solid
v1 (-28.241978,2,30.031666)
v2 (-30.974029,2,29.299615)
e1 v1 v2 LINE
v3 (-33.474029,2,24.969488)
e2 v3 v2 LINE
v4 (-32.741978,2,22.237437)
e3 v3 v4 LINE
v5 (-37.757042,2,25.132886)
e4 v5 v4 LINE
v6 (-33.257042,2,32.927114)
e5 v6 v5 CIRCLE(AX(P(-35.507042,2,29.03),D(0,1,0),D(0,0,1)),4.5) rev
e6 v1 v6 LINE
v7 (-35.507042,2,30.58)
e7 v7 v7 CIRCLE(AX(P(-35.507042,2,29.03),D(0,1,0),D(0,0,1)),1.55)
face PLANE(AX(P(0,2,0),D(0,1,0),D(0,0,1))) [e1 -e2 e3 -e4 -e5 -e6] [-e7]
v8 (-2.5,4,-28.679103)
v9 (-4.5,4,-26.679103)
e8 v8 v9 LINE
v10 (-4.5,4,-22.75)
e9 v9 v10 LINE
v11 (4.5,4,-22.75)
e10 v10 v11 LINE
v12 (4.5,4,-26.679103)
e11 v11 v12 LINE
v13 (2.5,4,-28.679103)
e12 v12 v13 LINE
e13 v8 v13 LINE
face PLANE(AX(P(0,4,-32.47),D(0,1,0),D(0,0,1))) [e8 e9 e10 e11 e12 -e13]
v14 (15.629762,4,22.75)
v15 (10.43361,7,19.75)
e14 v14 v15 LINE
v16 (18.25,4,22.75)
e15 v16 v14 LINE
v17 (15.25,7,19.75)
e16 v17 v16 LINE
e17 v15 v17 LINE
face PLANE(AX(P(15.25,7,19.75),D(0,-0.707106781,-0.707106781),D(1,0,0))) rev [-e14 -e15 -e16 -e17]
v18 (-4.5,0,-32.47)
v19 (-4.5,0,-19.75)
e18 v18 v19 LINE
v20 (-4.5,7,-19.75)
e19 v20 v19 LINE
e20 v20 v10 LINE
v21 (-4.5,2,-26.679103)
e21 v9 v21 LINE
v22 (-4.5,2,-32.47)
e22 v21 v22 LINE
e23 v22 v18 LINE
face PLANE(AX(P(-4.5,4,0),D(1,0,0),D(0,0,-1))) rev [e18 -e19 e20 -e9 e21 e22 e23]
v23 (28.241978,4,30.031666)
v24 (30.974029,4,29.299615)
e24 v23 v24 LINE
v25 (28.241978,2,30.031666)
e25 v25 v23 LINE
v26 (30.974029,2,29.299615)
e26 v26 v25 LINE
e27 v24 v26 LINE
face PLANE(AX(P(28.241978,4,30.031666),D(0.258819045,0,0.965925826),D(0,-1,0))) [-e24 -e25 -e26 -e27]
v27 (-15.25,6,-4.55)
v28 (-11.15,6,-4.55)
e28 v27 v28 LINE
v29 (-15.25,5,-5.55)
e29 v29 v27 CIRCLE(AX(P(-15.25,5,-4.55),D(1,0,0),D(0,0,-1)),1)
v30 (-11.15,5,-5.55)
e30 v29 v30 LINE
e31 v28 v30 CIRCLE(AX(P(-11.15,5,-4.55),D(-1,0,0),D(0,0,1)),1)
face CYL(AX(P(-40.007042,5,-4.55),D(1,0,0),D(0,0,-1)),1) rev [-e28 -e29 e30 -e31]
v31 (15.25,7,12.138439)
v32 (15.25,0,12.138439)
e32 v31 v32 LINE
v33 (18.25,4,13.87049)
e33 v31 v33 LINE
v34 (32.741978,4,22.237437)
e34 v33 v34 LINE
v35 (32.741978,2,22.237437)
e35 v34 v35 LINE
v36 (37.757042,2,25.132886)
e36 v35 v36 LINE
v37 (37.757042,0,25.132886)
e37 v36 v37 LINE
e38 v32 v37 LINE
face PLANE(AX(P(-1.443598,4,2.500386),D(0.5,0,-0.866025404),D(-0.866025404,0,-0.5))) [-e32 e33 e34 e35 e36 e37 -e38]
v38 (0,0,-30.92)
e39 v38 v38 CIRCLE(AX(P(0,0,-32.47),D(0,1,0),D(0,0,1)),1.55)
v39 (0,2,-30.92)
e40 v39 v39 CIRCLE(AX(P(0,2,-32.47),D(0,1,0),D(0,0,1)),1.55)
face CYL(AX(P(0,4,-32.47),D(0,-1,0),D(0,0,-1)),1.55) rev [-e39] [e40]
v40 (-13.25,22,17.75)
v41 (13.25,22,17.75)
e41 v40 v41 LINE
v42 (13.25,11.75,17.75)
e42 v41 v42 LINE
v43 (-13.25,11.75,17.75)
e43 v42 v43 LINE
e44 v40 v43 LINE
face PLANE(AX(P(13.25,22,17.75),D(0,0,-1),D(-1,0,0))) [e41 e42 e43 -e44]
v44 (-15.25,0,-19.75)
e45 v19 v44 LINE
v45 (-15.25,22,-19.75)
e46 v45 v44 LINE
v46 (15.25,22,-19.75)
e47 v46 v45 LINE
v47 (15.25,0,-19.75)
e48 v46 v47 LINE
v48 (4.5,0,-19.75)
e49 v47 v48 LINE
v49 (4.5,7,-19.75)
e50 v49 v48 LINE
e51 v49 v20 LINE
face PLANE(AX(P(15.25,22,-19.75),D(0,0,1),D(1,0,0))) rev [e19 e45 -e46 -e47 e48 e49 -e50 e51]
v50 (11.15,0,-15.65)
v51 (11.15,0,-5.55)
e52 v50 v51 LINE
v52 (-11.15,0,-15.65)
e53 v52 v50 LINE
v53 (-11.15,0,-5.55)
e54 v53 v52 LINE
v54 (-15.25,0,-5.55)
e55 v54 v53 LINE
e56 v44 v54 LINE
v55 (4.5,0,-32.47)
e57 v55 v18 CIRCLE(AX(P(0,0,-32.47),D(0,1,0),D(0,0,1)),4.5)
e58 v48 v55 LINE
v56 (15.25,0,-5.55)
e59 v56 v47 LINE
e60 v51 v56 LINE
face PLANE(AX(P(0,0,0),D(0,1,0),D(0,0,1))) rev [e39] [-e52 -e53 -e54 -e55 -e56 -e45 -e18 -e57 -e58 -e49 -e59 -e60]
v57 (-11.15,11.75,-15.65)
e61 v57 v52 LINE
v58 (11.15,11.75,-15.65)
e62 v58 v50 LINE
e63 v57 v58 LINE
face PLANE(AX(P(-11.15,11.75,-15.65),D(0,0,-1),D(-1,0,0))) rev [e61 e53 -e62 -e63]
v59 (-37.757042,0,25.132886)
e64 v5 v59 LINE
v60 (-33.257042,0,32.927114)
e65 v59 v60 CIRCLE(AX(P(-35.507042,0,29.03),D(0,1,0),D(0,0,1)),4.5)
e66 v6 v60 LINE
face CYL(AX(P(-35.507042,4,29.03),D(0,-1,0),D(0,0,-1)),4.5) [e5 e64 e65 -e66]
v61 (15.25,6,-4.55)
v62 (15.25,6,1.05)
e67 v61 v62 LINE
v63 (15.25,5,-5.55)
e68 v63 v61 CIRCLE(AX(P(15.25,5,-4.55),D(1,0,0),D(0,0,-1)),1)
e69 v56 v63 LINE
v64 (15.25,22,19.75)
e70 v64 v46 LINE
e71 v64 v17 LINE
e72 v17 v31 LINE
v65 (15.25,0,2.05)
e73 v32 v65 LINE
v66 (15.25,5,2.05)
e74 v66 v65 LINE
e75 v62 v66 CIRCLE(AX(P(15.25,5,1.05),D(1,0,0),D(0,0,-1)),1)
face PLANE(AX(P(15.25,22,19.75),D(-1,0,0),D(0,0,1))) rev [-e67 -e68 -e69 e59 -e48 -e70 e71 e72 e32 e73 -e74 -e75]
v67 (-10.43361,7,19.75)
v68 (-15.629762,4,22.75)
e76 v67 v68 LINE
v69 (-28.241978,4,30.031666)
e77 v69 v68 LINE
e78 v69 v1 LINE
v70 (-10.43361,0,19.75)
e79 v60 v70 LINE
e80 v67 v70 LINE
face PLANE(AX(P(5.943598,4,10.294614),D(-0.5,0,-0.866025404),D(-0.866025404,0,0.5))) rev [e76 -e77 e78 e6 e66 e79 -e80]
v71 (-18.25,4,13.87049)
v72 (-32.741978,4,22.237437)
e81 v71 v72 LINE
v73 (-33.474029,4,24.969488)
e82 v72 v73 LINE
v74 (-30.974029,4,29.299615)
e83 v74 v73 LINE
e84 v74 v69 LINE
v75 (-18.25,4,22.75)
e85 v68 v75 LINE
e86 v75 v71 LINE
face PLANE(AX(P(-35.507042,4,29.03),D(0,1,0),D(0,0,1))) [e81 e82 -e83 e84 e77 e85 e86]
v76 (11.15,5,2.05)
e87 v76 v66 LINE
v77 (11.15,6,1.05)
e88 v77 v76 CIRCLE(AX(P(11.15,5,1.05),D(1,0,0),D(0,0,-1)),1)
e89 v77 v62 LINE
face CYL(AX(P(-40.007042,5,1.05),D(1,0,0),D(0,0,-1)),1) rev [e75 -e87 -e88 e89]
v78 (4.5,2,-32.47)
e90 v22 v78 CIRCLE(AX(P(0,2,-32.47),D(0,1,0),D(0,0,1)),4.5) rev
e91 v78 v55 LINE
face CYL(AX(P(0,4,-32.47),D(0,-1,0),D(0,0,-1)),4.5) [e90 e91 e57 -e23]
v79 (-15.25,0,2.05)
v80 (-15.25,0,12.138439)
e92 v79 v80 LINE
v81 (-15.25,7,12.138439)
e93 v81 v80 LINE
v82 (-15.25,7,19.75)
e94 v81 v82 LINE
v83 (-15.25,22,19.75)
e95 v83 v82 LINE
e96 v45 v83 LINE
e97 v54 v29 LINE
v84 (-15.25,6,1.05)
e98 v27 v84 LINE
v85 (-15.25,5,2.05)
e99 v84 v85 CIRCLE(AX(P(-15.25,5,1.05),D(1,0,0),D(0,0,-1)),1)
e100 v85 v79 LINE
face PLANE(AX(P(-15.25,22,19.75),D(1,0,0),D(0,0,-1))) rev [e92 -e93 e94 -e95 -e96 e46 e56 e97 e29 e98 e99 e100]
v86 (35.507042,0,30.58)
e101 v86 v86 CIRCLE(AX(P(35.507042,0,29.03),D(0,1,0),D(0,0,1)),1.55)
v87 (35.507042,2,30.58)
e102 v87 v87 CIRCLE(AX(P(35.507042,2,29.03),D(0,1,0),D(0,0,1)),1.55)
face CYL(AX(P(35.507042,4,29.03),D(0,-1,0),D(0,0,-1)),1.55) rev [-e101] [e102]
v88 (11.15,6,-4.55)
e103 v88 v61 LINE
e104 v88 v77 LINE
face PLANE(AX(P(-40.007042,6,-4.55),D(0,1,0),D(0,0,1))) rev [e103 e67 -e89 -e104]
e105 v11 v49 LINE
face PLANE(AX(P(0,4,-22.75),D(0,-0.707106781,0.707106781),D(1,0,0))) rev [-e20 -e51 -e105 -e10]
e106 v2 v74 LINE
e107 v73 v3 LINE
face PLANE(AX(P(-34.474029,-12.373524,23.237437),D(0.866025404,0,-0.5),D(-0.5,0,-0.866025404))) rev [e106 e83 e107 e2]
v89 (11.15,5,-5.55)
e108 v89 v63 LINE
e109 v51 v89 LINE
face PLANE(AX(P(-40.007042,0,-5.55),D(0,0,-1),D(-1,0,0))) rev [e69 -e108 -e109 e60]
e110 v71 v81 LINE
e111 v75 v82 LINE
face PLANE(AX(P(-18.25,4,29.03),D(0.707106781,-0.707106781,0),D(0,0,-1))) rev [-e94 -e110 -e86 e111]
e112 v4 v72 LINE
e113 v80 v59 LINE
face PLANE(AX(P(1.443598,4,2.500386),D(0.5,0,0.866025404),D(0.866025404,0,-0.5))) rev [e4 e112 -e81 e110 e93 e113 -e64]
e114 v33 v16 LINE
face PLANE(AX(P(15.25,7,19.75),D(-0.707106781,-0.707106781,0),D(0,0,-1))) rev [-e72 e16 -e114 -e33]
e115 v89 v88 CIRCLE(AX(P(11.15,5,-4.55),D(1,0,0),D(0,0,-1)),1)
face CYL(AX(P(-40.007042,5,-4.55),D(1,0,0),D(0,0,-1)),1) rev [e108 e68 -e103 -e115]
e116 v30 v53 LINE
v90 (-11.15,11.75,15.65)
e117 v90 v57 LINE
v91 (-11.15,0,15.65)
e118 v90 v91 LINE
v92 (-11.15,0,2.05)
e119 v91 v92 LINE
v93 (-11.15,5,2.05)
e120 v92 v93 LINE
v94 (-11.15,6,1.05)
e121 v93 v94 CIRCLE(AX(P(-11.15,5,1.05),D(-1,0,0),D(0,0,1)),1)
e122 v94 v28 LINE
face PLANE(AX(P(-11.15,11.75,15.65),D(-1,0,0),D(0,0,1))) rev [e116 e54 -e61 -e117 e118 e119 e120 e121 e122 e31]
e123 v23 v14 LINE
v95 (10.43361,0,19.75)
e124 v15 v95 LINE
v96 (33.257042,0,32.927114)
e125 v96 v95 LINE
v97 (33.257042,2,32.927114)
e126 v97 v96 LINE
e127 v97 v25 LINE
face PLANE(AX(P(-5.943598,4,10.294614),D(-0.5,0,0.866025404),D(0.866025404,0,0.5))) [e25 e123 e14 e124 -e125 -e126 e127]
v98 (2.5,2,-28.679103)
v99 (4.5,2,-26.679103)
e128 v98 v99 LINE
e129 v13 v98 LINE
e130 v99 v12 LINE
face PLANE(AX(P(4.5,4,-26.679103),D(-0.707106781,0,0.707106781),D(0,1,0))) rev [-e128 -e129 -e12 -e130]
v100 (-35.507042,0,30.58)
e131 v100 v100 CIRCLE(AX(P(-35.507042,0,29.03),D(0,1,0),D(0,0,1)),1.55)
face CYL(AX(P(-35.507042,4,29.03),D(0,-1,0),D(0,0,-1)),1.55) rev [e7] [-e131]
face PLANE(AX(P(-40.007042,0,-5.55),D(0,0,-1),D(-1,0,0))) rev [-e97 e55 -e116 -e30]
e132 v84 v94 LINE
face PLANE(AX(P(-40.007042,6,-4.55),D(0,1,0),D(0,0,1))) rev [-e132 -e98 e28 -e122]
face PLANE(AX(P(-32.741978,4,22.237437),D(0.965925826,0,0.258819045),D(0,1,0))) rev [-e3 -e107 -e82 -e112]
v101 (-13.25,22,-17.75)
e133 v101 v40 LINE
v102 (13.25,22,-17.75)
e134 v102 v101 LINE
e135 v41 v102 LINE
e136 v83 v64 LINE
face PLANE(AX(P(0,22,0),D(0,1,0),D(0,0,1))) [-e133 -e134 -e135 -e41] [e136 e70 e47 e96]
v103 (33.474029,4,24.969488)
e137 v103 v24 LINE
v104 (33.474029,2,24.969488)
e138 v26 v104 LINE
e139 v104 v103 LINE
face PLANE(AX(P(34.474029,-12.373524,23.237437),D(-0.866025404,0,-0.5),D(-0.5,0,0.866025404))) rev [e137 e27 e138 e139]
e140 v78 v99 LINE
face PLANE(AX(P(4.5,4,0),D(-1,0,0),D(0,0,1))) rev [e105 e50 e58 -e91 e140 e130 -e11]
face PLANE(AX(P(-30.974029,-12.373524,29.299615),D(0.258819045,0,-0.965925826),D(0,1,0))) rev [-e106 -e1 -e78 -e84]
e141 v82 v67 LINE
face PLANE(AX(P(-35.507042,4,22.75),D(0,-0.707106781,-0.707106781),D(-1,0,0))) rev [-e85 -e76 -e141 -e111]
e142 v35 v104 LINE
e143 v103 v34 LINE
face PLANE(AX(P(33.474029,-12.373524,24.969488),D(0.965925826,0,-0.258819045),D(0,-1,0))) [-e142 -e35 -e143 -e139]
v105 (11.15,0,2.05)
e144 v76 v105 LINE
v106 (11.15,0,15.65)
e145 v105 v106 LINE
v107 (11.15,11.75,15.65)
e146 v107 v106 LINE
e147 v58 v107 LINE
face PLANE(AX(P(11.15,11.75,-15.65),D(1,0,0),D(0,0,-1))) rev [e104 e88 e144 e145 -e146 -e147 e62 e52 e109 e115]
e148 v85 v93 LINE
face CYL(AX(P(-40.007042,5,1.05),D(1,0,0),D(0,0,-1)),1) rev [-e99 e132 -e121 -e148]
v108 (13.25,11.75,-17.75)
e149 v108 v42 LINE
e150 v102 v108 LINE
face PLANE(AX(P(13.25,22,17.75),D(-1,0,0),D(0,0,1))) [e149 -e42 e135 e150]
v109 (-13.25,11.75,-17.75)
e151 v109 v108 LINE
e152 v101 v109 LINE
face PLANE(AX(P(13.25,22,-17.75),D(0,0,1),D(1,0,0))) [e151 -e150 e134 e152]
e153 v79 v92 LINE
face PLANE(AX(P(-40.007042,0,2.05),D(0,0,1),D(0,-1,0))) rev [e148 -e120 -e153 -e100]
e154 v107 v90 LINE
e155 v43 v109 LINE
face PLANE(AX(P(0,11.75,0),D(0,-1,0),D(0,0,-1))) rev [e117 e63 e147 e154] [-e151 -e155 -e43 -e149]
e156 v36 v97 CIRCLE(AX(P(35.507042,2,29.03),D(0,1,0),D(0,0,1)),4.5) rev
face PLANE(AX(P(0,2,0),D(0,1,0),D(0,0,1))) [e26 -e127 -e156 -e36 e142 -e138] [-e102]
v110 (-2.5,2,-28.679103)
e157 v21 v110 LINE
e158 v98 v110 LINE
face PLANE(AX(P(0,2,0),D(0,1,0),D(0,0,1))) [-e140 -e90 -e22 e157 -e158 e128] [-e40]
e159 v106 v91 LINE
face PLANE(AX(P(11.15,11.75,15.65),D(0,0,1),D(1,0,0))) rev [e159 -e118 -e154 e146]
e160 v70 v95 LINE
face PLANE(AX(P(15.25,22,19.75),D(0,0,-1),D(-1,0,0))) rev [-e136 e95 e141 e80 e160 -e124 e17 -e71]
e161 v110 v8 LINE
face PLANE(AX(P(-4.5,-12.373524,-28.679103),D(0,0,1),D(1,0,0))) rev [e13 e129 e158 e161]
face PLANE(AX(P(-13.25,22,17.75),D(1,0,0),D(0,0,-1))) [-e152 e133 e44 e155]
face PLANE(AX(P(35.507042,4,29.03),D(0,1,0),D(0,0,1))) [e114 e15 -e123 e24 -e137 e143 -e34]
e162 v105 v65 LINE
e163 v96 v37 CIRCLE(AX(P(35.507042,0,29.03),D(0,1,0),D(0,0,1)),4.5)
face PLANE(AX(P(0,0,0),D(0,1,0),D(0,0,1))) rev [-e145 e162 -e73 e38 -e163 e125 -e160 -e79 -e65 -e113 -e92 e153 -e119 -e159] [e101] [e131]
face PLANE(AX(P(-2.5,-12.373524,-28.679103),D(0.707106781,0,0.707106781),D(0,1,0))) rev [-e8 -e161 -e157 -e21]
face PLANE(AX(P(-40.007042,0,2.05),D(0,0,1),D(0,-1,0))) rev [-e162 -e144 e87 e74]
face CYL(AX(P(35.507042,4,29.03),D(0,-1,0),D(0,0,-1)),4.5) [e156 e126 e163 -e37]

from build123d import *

# Parameters (mm, degrees)
SKETCH1_W           = 30.5
SKETCH1_H           = 39.5
SKETCH1_W_2         = 26.5
SKETCH1_H_2         = 35.5
BOSS_EXTRUDE1_DEPTH = 22
SKETCH3_W           = 26.5
SKETCH3_H           = 35.5
SKETCH3_W_2         = 22.3
SKETCH3_H_2         = 31.3
BOSS_EXTRUDE3_DEPTH = 11.75
BOSS_EXTRUDE4_START = -22
SKETCH4_R           = 1.55
BOSS_EXTRUDE4_DEPTH = 4
CUT_EXTRUDE1_DEPTH  = 2
CHAMFER2_SIZE       = 3
CUT_EXTRUDE2_DEPTH  = 71.029433394
CUT_EXTRUDE3_START  = -2
CUT_EXTRUDE3_DEPTH  = 2
CHAMFER3_SIZE       = 2


with BuildPart() as part:
    # Sketch1 → Boss-Extrude1 (new body)
    with BuildSketch(Plane(origin=(0, 0, 0), x_dir=(1, 0, 0), z_dir=(0, 1, 0))):
        Rectangle(SKETCH1_W, SKETCH1_H)
        Rectangle(SKETCH1_W_2, SKETCH1_H_2, mode=Mode.SUBTRACT)
    extrude(amount=BOSS_EXTRUDE1_DEPTH)

    # Sketch3 → Boss-Extrude3 (add)
    with BuildSketch(Plane.XZ):
        Rectangle(SKETCH3_W, SKETCH3_H)
        Rectangle(SKETCH3_W_2, SKETCH3_H_2, mode=Mode.SUBTRACT)
    extrude(amount=-BOSS_EXTRUDE3_DEPTH)

    # Sketch4 → Boss-Extrude4 (add)
    # profile 1 of 2: a face of its own
    with BuildSketch(Plane(origin=(0, 22, 0), x_dir=(1, 0, 0), z_dir=(0, 1, 0)).offset(BOSS_EXTRUDE4_START)):
        with BuildLine():
            Line((-33.257041555, -32.927114317), (-10.433610061, -19.75))
            Line((-10.433610061, -19.75), (-15.25, -19.75))
            Line((-15.25, -19.75), (-15.25, -12.138439182))
            Line((-15.25, -12.138439182), (-37.757041555, -25.132885683))
            ThreePointArc((-37.757041555, -25.132885683), (-39.404155872, -31.28), (-33.257041555, -32.927114317))
        make_face()
        with Locations(Location((-35.507041555, -29.03, 0), (0, 0, 270))):
            Circle(SKETCH4_R, mode=Mode.SUBTRACT)
    # profile 2 of 2: a face of its own
    with BuildSketch(Plane(origin=(0, 22, 0), x_dir=(1, 0, 0), z_dir=(0, 1, 0)).offset(BOSS_EXTRUDE4_START)):
        with BuildLine():
            Line((-4.5, 19.75), (4.5, 19.75))
            Line((4.5, 19.75), (4.5, 32.47))
            ThreePointArc((4.5, 32.47), (0, 36.97), (-4.5, 32.47))
            Line((-4.5, 32.47), (-4.5, 19.75))
        make_face()
        with Locations(Location((0, 32.47, 0), (0, 0, 270))):
            Circle(SKETCH4_R, mode=Mode.SUBTRACT)
    boss_extrude4 = extrude(amount=BOSS_EXTRUDE4_DEPTH)

    # Sketch6 → Cut-Extrude1 (cut)
    with BuildSketch(Plane(origin=(0, 4, 0), x_dir=(1, 0, 0), z_dir=(0, 1, 0))):
        Polygon((-2.85, 34.115448267), (-2.85, 30.824551733), (0, 29.179103466), (2.85, 30.824551733), (2.85, 34.115448267), (0, 35.760896534), align=None)
        Polygon((-35.507041555, -32.320896534), (-32.657041555, -30.675448267), (-32.657041555, -27.384551733), (-35.507041555, -25.739103466), (-38.357041555, -27.384551733), (-38.357041555, -30.675448267), align=None)
    cut_extrude1 = extrude(amount=-CUT_EXTRUDE1_DEPTH, mode=Mode.SUBTRACT)

    # Mirror1: Boss-Extrude4, Cut-Extrude1 across plane
    add(boss_extrude4.mirror(Plane(origin=(0, 0, 0), x_dir=(0, 0, 1), z_dir=(1, 0, 0))))
    add(cut_extrude1.mirror(Plane(origin=(0, 0, 0), x_dir=(0, 0, 1), z_dir=(1, 0, 0))), mode=Mode.SUBTRACT)

    # Chamfer2
    # the kernel refuses this chamfer: 3 mm, written as the material it adds along each edge
    with BuildSketch(Plane(origin=(15.25, 4, 19.75), x_dir=(0, 1, 0), z_dir=(0, 0, -1))) as chamfer2_piece_1_section:
        Polygon((CHAMFER2_SIZE, 0), (0, CHAMFER2_SIZE), (0, 0), align=None)
    chamfer2_piece_1 = extrude(amount=15.326609781, mode=Mode.PRIVATE)
    chamfer2_piece_1 = split(chamfer2_piece_1, bisect_by=Plane(origin=(18.545902515, 4, 14.041329387), z_dir=(-0.4999999999999982, 0, 0.8660254037844397)), keep=Keep.TOP, mode=Mode.PRIVATE)
    add(chamfer2_piece_1)
    with BuildSketch(Plane(origin=(2.718561097, 4, 19.75), x_dir=(0, 1, 0), z_dir=(1, 0, 0))) as chamfer2_piece_2_section:
        Polygon((CHAMFER2_SIZE, 0), (0, CHAMFER2_SIZE), (0, 0), align=None)
    chamfer2_piece_2 = extrude(amount=12.531438903, mode=Mode.PRIVATE)
    chamfer2_piece_2 = split(chamfer2_piece_2, bisect_by=Plane(origin=(4.647323338, 4, 16.409285803), z_dir=(0.4999999999999978, 0, -0.8660254037844399)), keep=Keep.TOP, mode=Mode.PRIVATE)
    add(chamfer2_piece_2)
    with BuildSketch(Plane(origin=(-4.5, 4, -19.75), x_dir=(0, 1, 0), z_dir=(1, 0, 0))) as chamfer2_piece_3:
        Polygon((CHAMFER2_SIZE, 0), (0, -CHAMFER2_SIZE), (0, 0), align=None)
    extrude(amount=9)
    with BuildSketch(Plane(origin=(-15.25, 4, 19.75), x_dir=(0, 1, 0), z_dir=(0, 0, -1))) as chamfer2_piece_4_section:
        Polygon((CHAMFER2_SIZE, 0), (0, -CHAMFER2_SIZE), (0, 0), align=None)
    chamfer2_piece_4 = extrude(amount=15.326609781, mode=Mode.PRIVATE)
    chamfer2_piece_4 = split(chamfer2_piece_4, bisect_by=Plane(origin=(-18.545902515, 4, 14.041329387), z_dir=(0.4999999999999982, 0, 0.8660254037844397)), keep=Keep.TOP, mode=Mode.PRIVATE)
    add(chamfer2_piece_4)
    with BuildSketch(Plane(origin=(-2.718561097, 4, 19.75), x_dir=(0, 1, 0), z_dir=(-1, 0, 0))) as chamfer2_piece_5_section:
        Polygon((CHAMFER2_SIZE, 0), (0, -CHAMFER2_SIZE), (0, 0), align=None)
    chamfer2_piece_5 = extrude(amount=12.531438903, mode=Mode.PRIVATE)
    chamfer2_piece_5 = split(chamfer2_piece_5, bisect_by=Plane(origin=(-4.647323338, 4, 16.409285803), z_dir=(-0.4999999999999978, 0, -0.8660254037844399)), keep=Keep.TOP, mode=Mode.PRIVATE)
    add(chamfer2_piece_5)
    with BuildSketch(Plane(origin=(15.25, 4, 27.465048964), x_dir=(0, 1, 0), z_dir=(0, 0, -1))) as chamfer2_piece_6a_section:
        Polygon((CHAMFER2_SIZE, 0), (0, CHAMFER2_SIZE), (0, 0), align=None)
    chamfer2_piece_6a = extrude(amount=23.041658745, mode=Mode.PRIVATE)
    chamfer2_piece_6a = split(chamfer2_piece_6a, bisect_by=Plane(origin=(15.25, 4, 19.75), z_dir=(0, 0, 1)), keep=Keep.TOP, mode=Mode.PRIVATE)
    chamfer2_piece_6a = split(chamfer2_piece_6a, bisect_by=Plane(origin=(17.386616712, 4, 23.764320262), z_dir=(0.4999999999999978, 0, -0.8660254037844399)), keep=Keep.TOP, mode=Mode.PRIVATE)
    with BuildSketch(Plane(origin=(2.718561097, 4, 19.75), x_dir=(0, 1, 0), z_dir=(1, 0, 0))) as chamfer2_piece_6b_section:
        Polygon((CHAMFER2_SIZE, 0), (0, CHAMFER2_SIZE), (0, 0), align=None)
    chamfer2_piece_6b = extrude(amount=20.246487867, mode=Mode.PRIVATE)
    chamfer2_piece_6b = split(chamfer2_piece_6b, bisect_by=Plane(origin=(15.25, 4, 19.75), z_dir=(1, 0, 0)), keep=Keep.TOP, mode=Mode.PRIVATE)
    chamfer2_piece_6b = split(chamfer2_piece_6b, bisect_by=Plane(origin=(4.647323338, 4, 16.409285803), z_dir=(0.4999999999999978, 0, -0.8660254037844399)), keep=Keep.TOP, mode=Mode.PRIVATE)
    chamfer2_piece_6 = chamfer2_piece_6a & chamfer2_piece_6b
    add(chamfer2_piece_6)
    with BuildSketch(Plane(origin=(-15.25, 4, 27.465048964), x_dir=(0, 1, 0), z_dir=(0, 0, -1))) as chamfer2_piece_7a_section:
        Polygon((CHAMFER2_SIZE, 0), (0, -CHAMFER2_SIZE), (0, 0), align=None)
    chamfer2_piece_7a = extrude(amount=23.041658745, mode=Mode.PRIVATE)
    chamfer2_piece_7a = split(chamfer2_piece_7a, bisect_by=Plane(origin=(-17.386616712, 4, 23.764320262), z_dir=(-0.4999999999999978, 0, -0.8660254037844399)), keep=Keep.TOP, mode=Mode.PRIVATE)
    chamfer2_piece_7a = split(chamfer2_piece_7a, bisect_by=Plane(origin=(-15.25, 4, 19.75), z_dir=(0, 0, 1)), keep=Keep.TOP, mode=Mode.PRIVATE)
    with BuildSketch(Plane(origin=(-2.718561097, 4, 19.75), x_dir=(0, 1, 0), z_dir=(-1, 0, 0))) as chamfer2_piece_7b_section:
        Polygon((CHAMFER2_SIZE, 0), (0, -CHAMFER2_SIZE), (0, 0), align=None)
    chamfer2_piece_7b = extrude(amount=20.246487867, mode=Mode.PRIVATE)
    chamfer2_piece_7b = split(chamfer2_piece_7b, bisect_by=Plane(origin=(-15.25, 4, 19.75), z_dir=(-1, 0, 0)), keep=Keep.TOP, mode=Mode.PRIVATE)
    chamfer2_piece_7b = split(chamfer2_piece_7b, bisect_by=Plane(origin=(-4.647323338, 4, 16.409285803), z_dir=(-0.4999999999999978, 0, -0.8660254037844399)), keep=Keep.TOP, mode=Mode.PRIVATE)
    chamfer2_piece_7 = chamfer2_piece_7a & chamfer2_piece_7b
    add(chamfer2_piece_7)

    # Sketch7 → Cut-Extrude2 (cut, through all)
    with BuildSketch(Plane(origin=(15.25, 0, 0), x_dir=(0, 0, -1), z_dir=(1, 0, 0))):
        with BuildLine():
            Line((5.55, 0), (-2.05, 0))
            Line((-2.05, 0), (-2.05, 5))
            ThreePointArc((-2.05, 5), (-1.757106781, 5.707106781), (-1.05, 6))
            Line((-1.05, 6), (4.55, 6))
            ThreePointArc((4.55, 6), (5.257106781, 5.707106781), (5.55, 5))
            Line((5.55, 5), (5.55, 0))
        make_face()
    extrude(amount=-CUT_EXTRUDE2_DEPTH, mode=Mode.SUBTRACT)

    # Sketch8 → Cut-Extrude3 (cut)
    with BuildSketch(Plane(origin=(0, 4, 0), x_dir=(1, 0, 0), z_dir=(0, 1, 0)).offset(CUT_EXTRUDE3_START)):
        with BuildLine():
            Line((-34.474028853, -23.237437416), (-29.974028853, -31.03166605))
            Line((-29.974028853, -31.03166605), (-33.257041555, -32.927114317))
            ThreePointArc((-33.257041555, -32.927114317), (-39.404155872, -31.28), (-37.757041555, -25.132885683))
            Line((-37.757041555, -25.132885683), (-34.474028853, -23.237437416))
        make_face()
        with BuildLine():
            Line((4.5, 28.679103466), (4.5, 32.47))
            ThreePointArc((4.5, 32.47), (0, 36.97), (-4.5, 32.47))
            Line((-4.5, 32.47), (-4.5, 28.679103466))
            Line((-4.5, 28.679103466), (4.5, 28.679103466))
        make_face()
        with BuildLine():
            Line((33.257041555, -32.927114317), (29.974028853, -31.03166605))
            Line((29.974028853, -31.03166605), (34.474028853, -23.237437416))
            Line((34.474028853, -23.237437416), (37.757041555, -25.132885683))
            ThreePointArc((37.757041555, -25.132885683), (39.404155872, -31.28), (33.257041555, -32.927114317))
        make_face()
    extrude(amount=CUT_EXTRUDE3_DEPTH, mode=Mode.SUBTRACT)

    # Chamfer3
    chamfer3_edges = [part.edges().sort_by_distance(p)[0] for p in [
        (-34.474028853, 3, 23.237437416),
        (-29.974028853, 3, 31.03166605),
        (4.5, 3, -28.679103466),
        (-4.5, 3, -28.679103466),
        (29.974028853, 3, 31.03166605),
        (34.474028853, 3, 23.237437416),
    ]]
    chamfer(chamfer3_edges, length=CHAMFER3_SIZE)


solid = part.part
